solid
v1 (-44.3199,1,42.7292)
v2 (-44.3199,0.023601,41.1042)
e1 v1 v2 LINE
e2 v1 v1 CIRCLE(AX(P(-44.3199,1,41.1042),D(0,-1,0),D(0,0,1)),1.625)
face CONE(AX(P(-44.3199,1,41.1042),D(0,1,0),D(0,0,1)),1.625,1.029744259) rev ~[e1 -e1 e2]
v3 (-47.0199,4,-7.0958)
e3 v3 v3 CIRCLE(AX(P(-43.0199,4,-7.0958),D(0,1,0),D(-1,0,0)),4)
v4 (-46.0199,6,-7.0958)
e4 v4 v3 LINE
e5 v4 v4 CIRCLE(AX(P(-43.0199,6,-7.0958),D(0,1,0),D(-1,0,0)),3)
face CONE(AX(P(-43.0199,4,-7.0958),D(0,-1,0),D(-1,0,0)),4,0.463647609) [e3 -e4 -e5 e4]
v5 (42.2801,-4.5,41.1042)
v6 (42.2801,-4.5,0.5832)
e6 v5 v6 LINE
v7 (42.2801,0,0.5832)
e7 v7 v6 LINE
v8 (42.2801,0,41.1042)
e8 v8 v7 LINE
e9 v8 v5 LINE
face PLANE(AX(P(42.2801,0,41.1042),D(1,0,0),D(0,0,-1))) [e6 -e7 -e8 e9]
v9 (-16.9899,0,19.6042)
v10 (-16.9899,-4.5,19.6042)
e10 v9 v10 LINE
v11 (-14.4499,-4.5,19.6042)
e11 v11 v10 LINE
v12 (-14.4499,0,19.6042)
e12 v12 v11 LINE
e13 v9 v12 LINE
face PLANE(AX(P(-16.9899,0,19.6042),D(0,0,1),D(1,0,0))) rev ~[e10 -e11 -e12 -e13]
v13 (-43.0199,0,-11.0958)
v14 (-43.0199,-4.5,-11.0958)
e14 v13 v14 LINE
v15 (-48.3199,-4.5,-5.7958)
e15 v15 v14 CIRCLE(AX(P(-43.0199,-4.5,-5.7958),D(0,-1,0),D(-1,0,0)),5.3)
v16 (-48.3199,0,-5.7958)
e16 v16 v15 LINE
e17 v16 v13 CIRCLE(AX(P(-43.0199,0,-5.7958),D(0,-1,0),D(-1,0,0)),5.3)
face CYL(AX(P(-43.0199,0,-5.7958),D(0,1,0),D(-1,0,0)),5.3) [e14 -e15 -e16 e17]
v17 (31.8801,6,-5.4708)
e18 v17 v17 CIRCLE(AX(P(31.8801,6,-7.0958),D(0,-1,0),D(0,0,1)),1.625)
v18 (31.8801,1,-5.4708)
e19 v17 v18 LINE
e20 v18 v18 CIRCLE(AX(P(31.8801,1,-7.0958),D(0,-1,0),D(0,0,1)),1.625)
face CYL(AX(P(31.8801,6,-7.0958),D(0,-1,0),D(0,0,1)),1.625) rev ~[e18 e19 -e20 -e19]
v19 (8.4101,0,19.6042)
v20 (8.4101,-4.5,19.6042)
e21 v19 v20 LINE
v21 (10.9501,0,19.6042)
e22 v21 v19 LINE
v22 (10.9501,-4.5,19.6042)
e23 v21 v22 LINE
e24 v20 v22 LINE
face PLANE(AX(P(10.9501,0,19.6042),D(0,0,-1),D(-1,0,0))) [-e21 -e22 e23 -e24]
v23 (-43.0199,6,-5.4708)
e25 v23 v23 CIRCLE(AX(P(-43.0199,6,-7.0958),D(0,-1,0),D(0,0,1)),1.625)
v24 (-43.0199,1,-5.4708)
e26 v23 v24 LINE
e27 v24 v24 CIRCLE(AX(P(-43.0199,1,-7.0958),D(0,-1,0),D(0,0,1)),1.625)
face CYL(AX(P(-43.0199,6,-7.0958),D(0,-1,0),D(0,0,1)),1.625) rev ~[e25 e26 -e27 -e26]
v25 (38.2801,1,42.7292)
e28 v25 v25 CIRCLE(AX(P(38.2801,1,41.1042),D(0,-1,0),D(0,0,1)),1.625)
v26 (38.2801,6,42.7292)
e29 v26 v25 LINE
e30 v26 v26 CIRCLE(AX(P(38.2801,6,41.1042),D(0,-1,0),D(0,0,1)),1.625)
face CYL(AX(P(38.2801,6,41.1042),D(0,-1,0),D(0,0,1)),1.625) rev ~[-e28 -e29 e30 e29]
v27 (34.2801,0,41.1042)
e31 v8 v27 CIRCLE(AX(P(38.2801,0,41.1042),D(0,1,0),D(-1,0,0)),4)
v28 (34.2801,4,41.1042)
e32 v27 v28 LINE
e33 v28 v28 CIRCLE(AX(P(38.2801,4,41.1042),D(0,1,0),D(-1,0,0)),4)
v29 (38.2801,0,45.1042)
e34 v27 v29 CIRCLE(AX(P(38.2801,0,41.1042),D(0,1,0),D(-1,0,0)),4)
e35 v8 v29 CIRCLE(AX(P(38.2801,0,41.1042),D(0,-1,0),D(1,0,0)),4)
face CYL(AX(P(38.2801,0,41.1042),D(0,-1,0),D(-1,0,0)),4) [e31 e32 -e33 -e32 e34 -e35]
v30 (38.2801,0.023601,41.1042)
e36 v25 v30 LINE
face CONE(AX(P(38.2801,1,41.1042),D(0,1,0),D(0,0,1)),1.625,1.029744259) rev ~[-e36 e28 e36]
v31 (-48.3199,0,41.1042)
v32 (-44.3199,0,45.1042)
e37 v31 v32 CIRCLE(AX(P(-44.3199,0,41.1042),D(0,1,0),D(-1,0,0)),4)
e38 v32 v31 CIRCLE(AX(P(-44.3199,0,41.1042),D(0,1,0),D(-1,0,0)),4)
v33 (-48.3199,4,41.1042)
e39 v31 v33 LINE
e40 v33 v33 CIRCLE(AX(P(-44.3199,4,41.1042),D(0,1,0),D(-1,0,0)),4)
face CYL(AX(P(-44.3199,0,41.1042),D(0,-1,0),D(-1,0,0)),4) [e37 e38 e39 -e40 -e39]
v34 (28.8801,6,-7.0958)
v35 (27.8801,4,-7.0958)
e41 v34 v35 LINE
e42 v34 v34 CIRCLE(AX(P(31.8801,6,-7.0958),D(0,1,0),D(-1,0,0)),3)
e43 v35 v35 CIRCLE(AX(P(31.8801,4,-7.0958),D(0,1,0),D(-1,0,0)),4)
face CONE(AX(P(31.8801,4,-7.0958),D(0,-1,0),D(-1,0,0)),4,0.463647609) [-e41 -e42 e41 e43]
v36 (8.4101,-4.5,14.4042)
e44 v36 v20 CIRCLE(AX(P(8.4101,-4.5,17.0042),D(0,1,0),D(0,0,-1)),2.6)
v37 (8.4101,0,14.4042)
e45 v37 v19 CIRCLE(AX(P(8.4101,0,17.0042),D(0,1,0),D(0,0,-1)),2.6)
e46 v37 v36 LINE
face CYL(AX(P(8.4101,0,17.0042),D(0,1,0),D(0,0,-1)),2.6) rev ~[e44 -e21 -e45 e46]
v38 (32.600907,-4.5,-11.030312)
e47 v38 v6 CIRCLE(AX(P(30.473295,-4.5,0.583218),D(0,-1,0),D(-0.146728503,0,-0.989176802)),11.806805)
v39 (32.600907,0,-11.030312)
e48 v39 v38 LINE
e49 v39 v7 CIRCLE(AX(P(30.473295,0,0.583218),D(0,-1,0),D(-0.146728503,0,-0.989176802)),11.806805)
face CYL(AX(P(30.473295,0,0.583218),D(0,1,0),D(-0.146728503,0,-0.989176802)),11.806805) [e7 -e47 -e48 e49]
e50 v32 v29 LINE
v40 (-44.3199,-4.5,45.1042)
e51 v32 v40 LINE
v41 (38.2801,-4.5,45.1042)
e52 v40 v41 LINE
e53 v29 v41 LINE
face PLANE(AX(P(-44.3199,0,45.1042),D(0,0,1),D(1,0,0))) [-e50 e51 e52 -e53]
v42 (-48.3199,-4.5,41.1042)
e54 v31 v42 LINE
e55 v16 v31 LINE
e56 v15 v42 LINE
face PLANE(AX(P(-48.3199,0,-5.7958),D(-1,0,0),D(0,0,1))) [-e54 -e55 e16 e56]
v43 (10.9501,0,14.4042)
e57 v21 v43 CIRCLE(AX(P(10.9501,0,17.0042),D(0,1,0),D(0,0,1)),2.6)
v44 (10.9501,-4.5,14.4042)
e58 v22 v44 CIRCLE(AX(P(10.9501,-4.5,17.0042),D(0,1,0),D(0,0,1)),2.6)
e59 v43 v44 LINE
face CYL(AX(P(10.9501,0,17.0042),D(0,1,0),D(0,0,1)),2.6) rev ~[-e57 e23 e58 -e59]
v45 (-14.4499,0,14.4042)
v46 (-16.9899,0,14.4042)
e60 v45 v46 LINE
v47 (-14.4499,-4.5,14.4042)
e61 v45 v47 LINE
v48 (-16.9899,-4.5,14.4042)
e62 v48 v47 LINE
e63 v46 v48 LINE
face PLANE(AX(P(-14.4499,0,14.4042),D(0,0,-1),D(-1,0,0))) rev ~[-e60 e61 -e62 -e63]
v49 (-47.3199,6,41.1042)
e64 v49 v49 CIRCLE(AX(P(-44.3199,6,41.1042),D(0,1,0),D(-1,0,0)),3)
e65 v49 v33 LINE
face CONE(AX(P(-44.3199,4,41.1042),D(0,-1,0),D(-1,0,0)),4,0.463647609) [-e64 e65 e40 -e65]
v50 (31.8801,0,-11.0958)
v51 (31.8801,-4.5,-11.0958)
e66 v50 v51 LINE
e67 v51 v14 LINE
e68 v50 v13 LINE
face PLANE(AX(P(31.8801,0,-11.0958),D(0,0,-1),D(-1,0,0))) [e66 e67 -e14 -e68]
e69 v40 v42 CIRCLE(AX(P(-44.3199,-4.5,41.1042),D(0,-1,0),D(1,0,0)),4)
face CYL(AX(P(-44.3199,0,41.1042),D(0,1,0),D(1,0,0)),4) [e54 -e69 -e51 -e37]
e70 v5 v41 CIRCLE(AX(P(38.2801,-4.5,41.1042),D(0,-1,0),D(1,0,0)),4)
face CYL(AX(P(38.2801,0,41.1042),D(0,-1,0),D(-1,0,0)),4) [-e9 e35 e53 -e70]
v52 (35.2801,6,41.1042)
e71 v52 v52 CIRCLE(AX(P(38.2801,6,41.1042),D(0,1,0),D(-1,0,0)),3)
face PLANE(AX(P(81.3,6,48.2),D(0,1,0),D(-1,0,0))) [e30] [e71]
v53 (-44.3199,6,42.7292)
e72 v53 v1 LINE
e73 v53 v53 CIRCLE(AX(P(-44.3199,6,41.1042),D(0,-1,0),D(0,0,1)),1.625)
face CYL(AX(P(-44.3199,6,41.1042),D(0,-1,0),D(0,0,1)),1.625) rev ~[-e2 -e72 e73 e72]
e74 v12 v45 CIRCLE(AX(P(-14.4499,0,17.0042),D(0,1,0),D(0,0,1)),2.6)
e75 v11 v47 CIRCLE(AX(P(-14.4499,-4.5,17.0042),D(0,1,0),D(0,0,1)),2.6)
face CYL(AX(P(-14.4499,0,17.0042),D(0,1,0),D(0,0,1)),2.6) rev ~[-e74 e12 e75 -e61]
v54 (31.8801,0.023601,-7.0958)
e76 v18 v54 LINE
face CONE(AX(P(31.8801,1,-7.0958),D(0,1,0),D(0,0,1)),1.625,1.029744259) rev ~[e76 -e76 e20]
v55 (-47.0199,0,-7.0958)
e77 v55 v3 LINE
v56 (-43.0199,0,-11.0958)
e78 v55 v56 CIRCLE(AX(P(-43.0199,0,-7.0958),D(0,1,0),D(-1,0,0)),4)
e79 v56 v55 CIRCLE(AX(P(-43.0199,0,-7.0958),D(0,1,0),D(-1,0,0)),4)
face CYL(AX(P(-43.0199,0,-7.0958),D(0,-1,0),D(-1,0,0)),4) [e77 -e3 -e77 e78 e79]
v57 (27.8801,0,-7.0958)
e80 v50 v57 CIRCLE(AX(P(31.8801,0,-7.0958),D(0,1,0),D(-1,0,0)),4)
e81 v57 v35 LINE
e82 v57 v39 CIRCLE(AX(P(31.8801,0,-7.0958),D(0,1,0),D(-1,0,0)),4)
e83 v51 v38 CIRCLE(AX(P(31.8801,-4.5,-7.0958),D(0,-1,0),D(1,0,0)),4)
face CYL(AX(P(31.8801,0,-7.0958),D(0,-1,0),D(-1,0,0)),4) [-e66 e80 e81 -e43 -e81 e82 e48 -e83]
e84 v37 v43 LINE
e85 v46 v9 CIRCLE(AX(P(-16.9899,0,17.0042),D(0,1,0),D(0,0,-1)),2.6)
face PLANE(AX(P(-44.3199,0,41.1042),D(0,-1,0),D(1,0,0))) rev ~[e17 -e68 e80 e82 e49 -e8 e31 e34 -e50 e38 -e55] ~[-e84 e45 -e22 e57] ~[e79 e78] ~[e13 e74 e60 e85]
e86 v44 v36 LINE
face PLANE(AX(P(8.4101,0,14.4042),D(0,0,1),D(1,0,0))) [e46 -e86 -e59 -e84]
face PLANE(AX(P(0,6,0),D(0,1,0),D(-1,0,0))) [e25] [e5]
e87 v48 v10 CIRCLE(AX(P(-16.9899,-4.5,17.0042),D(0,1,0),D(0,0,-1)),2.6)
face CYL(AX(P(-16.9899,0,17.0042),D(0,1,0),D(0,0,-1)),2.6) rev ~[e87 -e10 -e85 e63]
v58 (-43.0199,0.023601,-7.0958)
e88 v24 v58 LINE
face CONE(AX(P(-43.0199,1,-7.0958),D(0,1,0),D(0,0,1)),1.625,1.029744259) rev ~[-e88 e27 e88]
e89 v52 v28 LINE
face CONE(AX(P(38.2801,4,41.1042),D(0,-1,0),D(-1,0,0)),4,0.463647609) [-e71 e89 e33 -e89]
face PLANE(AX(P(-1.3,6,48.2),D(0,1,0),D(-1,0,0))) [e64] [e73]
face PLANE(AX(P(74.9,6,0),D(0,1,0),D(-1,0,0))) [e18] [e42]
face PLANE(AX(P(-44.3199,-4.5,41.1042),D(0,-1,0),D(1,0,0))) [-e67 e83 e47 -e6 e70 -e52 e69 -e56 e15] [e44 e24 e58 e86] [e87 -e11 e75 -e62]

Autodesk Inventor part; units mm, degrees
ref_plane "YZ Plane" through (0, 0, 0) normal (1, 0, 0) x (0, 1, 0)
ref_plane "XZ Plane" through (0, 0, 0) normal (0, 1, 0) x (-1, 0, 0)
ref_plane "XY Plane" through (0, 0, 0) normal (0, 0, 1) x (1, 0, 0)
sketch "Arduino Hole Layout" plane through (0, 0, 0) normal (0, 1, 0) x (-1, 0, 0)
  circle A0 centre (43.0199, -7.0958) radius 1.55 construction
  circle A1 centre (-31.8801, -7.0958) radius 1.55 construction
  circle A2 centre (44.3199, 41.1042) radius 1.55 construction
  circle A3 centre (-38.2801, 41.1042) radius 1.55 construction
  line L0 (58.8879, -10.055) -> (-40.7911, -10.055) construction
  line L1 (-40.7911, -10.055) -> (-40.7911, 44.0634) construction
  line L2 (-40.7911, 44.0634) -> (58.8879, 44.0634) construction
  line L3 (58.8879, 44.0634) -> (58.8879, -10.055) construction
  line L4 (43.0199, -7.0958) -> (43.0199, -10.055) construction
  line L5 (44.3199, 41.1042) -> (44.3199, 44.0634) construction
  dimension "d0" = 3.1
  dimension "d1" = 74.9
  dimension "d2" = 1.3
  dimension "d3" = 48.2
  dimension "d5" = 82.6
  dimension "d9" = 15.868
  dimension "d10" = 54.1184
  dimension "d11" = 99.679
sketch "Sketch13" plane through (0, 0, 0) normal (0, 1, 0) x (-1, 0, 0)
  circle A0 centre (43.0199, -7.0958) radius 1.55 construction
  circle A1 centre (43.0199, -7.0958) radius 4
  point P0 (0, 0)
  point P1 (-38.2801, 41.1042)
  point P2 (-31.8801, -7.0958)
  point P3 (-38.2801, 41.1042)
  point P4 (44.3199, 41.1042)
  dimension "d48" = 8
extrude "Extrusion10" add sketch "Sketch13" along normal blind 6
sketch "Sketch14" plane through (-43.0199, 6, -7.0958) normal (0, 1, 0) x (1, 0, 0)
  circle A0 centre (0, 0) radius 4 construction
  point P0 (43.0199, -7.0958)
  point P1 (81.3, -48.2)
  point P2 (-1.3, -48.2)
  point P3 (74.9, 0)
  point P4 (81.3, -48.2)
  point P5 (-1.3, -48.2)
hole "Hole2" at (-43.0199, 6, -7.0958) direction (0, -1, 0) diameter 3.25 depth 5 tip angle 118
chamfer "Chamfer2" distance 1 distance2 2 1 edges at (-39.0199, 6, -7.0958) measured on face at (-46.1856, 6, -7.4802)
pattern_sketch "Sketch Driven Pattern1" from (-43.0199, 0, -7.0958) copies at (-44.3199, 0, 41.1042) at (31.8801, 0, -7.0958) at (38.2801, 0, 41.1042)
sketch "Sketch16" plane through (-44.3199, 0, 41.1042) normal (0, -1, 0) x (1, 0, 0)
  line L0 (-4, 4) -> (86.6, 4)
  line L1 (86.6, 4) -> (86.6, -52.2)
  line L2 (86.6, -52.2) -> (-4, -52.2)
  line L3 (-4, -52.2) -> (-4, 4)
  circle A0 centre (0, 0) radius 4 projected
  circle A1 centre (82.6, 0) radius 4 projected
  circle A2 centre (1.3, -48.2) radius 4 projected
  arc A3 (-4, -46.9) -> (1.3, -52.2) centre (1.3, -46.9) ccw
  arc A4 (73.0608, -52.2) -> (86.6, -40.521) centre (74.7932, -40.521) ccw
  circle A5 centre (76.2, -48.2) radius 4 projected
  point P0 (44.3199, -41.1042)
  point P1 (76.9208, -52.1345)
  point P2 (86.6, 0)
  point P3 (82.6, 4)
  point P4 (0, 4)
  point P5 (-4, 0)
  point P6 (76.2, -52.2)
extrude "Extrusion12" add sketch "Sketch16" along normal blind 4.5 contours A2 | L0 A1 L1 A4 A5 L2 A3 L3 A0 | A0 | A1 | A5
sketch "Sketch17" plane through (-44.3199, 0, 41.1042) normal (0, 1, 0) x (1, 0, 0)
  line L0 (-4, 52.2) -> (86.6, 52.2) construction
  line L1 (86.6, 52.2) -> (86.6, -4) construction
  line L2 (86.6, -4) -> (-4, -4) construction
  line L3 (-4, -4) -> (-4, 52.2) construction
  circle A0 centre (1.3, 48.2) radius 4 construction
  circle A1 centre (76.2, 48.2) radius 4 construction
  circle A2 centre (82.6, 0) radius 4 construction
  circle A3 centre (0, 0) radius 4 construction
  line L4 (41.3, 52.2) -> (41.3, -4) construction
  line L5 (82.6, -4) -> (0, -4) construction
  line L6 (-4, 24.1) -> (86.6, 24.1) construction
  line L7 (27.33, 24.1) -> (29.87, 24.1) construction
  line L8 (27.33, 21.5) -> (29.87, 21.5)
  line L9 (29.87, 26.7) -> (27.33, 26.7)
  arc A4 (27.33, 26.7) -> (27.33, 21.5) centre (27.33, 24.1) ccw
  arc A5 (29.87, 21.5) -> (29.87, 26.7) centre (29.87, 24.1) ccw
  line L10 (55.27, 21.5) -> (52.73, 21.5)
  line L11 (52.73, 26.7) -> (55.27, 26.7)
  arc A6 (55.27, 21.5) -> (55.27, 26.7) centre (55.27, 24.1) ccw
  arc A7 (52.73, 26.7) -> (52.73, 21.5) centre (52.73, 24.1) ccw
  point P0 (44.3199, 41.1042)
  point P1 (41.3, 24.1)
  point P2 (41.3, 24.1)
  point P3 (28.6, 24.1)
  point P4 (28.6, 26.7)
  point P5 (28.6, 21.5)
  dimension "d68" = 11.43
  dimension "d69" = 13.97
  dimension "d70" = 5.2
extrude "Extrusion13" cut sketch "Sketch17" against normal blind 10
properties part number "arduino_mega_standoffs_plate_t-slot-2inx1in"
